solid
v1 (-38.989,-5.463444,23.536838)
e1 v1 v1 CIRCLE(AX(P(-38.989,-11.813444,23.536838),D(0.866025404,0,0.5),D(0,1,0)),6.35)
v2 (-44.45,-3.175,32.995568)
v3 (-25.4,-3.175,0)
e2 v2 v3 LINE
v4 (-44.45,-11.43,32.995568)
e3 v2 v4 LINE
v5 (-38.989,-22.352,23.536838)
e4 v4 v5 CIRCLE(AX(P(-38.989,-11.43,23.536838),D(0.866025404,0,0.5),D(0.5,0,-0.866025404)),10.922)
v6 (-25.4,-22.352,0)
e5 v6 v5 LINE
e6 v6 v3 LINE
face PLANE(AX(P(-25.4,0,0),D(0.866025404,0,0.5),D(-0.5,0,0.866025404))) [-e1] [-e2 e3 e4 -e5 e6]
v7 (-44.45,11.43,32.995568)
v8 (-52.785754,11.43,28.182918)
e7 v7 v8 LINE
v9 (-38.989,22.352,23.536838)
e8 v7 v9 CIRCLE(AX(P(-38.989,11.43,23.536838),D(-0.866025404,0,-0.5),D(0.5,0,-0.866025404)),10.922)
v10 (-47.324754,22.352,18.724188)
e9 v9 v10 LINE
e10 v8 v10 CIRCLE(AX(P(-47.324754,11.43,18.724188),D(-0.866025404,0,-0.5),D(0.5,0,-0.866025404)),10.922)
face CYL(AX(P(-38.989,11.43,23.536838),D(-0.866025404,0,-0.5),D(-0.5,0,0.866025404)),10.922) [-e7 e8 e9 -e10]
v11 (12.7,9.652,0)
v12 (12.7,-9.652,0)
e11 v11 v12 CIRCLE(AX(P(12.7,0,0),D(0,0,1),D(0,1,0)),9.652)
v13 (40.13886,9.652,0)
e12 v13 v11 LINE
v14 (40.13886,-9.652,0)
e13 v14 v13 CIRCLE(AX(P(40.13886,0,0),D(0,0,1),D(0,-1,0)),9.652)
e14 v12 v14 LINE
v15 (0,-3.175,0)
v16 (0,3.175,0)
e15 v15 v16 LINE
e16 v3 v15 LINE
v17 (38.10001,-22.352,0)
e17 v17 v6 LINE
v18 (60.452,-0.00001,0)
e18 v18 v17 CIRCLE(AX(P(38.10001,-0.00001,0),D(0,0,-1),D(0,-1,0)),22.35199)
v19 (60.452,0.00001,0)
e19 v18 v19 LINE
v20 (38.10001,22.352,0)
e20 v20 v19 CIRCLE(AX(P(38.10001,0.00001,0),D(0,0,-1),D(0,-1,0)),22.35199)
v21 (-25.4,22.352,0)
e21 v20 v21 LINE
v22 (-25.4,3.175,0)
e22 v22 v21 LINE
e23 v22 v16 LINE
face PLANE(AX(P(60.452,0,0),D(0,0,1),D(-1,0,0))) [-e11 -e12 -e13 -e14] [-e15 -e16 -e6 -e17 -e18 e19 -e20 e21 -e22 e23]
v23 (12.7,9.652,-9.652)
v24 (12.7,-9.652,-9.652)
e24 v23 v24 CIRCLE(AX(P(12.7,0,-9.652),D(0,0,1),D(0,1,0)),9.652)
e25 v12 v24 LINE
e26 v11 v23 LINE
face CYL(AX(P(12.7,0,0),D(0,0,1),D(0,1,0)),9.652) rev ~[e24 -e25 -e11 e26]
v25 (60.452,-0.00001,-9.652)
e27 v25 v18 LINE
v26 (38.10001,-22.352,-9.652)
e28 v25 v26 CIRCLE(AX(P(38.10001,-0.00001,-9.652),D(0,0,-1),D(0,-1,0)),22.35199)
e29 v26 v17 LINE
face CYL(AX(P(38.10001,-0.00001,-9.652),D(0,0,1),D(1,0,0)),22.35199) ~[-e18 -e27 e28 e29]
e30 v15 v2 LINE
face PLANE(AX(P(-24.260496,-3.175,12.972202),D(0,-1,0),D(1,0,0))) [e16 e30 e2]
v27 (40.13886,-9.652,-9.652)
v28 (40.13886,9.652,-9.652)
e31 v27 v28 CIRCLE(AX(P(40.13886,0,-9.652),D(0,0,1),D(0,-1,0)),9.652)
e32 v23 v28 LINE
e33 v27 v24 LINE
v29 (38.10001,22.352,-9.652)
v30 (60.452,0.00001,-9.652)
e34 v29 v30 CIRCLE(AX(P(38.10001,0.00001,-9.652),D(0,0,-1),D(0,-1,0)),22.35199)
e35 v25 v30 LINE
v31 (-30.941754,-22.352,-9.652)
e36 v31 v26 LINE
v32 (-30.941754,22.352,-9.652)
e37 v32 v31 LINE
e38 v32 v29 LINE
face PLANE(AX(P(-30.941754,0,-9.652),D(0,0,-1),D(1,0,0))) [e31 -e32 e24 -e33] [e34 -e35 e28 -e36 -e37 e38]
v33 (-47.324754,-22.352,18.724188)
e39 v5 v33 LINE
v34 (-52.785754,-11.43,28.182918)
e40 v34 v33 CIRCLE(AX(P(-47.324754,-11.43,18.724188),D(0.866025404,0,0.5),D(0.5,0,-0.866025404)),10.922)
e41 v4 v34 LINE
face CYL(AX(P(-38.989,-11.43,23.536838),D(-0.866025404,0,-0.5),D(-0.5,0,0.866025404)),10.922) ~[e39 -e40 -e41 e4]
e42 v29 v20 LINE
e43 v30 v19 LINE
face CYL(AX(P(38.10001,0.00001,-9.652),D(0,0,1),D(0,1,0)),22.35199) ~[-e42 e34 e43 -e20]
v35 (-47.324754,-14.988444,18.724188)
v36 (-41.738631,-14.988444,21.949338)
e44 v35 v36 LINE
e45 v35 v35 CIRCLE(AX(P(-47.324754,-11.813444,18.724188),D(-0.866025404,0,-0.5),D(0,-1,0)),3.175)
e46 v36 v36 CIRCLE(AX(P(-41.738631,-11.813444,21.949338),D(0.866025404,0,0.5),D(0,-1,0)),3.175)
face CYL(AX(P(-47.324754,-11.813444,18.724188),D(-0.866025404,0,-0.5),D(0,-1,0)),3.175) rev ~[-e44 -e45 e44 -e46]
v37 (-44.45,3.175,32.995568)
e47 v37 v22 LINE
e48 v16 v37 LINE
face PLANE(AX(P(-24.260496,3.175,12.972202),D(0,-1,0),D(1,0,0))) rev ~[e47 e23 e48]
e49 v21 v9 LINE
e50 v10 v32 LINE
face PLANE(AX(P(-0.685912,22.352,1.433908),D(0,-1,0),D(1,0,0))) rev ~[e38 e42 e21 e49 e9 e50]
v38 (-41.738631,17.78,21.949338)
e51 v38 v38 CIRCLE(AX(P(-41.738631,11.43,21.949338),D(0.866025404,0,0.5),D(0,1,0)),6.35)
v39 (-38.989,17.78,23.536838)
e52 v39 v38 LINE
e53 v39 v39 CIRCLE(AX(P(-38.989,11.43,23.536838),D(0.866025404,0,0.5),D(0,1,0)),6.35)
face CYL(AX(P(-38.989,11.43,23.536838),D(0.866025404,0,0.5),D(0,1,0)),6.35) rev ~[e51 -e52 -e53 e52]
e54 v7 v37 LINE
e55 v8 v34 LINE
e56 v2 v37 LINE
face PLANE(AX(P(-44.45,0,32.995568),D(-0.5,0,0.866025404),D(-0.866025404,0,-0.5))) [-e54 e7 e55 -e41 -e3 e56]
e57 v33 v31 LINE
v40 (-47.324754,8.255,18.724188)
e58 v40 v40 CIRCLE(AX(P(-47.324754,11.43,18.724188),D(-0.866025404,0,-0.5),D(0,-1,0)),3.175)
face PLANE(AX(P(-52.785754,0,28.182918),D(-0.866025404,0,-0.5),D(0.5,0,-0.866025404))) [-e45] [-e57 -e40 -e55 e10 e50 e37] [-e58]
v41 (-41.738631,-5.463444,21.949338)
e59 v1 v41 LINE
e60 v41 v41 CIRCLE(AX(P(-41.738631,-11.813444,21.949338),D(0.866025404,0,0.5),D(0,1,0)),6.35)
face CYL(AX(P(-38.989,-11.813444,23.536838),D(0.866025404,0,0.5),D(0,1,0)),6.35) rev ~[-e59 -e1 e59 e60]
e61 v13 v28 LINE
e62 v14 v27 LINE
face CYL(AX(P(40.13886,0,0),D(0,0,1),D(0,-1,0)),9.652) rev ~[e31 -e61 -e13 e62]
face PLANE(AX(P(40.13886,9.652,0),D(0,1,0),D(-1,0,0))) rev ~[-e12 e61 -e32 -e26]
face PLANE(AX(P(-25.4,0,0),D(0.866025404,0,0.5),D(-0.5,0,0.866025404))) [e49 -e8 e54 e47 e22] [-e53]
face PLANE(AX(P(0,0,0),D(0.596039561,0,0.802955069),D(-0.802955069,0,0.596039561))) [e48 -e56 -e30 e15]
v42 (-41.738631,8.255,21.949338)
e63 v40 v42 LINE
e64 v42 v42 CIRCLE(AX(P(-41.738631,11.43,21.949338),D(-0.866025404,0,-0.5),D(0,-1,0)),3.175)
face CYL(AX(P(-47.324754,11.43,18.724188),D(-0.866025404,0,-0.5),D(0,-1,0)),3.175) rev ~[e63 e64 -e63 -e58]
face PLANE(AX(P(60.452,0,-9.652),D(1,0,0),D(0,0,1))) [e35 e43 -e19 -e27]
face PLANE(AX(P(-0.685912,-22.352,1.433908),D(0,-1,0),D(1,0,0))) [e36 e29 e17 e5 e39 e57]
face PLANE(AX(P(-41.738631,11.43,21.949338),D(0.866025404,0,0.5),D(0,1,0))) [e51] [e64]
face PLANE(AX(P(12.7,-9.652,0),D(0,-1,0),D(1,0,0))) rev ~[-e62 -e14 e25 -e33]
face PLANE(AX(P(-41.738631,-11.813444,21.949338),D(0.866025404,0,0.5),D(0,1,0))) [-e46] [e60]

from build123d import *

# Parameters (mm, degrees)
F1_DEPTH = 22.352
F2_DEPTH = 3.175
F4_R     = 22.35199
F5_DEPTH = 25.4
F6_R     = 3.175
F7_DEPTH = 25.4
F8_R     = 6.35
F8_R_2   = 3.175
F9_DEPTH = 3.175
F10_R    = 10.922


# Not quite as in the source:
# - a fillet or chamfer is up to 0.001 mm smaller than in the source, because OpenCascade refuses the exact size


with BuildPart() as f1:
    # F0 (on Front) → F1 (new body, symmetric)
    with BuildSketch(Plane.XZ):
        Polygon((0, 0), (-25.4, 0), (-44.45, 32.9955678842), (-52.7857543947, 28.1829178405), (-30.9417543947, -9.652), (60.452, -9.652), (60.452, 0), align=None)
    extrude(amount=F1_DEPTH, both=True)

    # F0 (on Front) → F2 (join, symmetric)
    with BuildSketch(Plane.XZ):
        Polygon((-44.45, 32.9955678842), (-25.4, 0), (0, 0), align=None)
    extrude(amount=F2_DEPTH, both=True)

    # F4 (radius 22.352 in the source; OpenCascade refuses exactly that, so slightly less here)
    f4_edges = [f1.edges().sort_by_distance(p)[0] for p in [
        (60.452, -22.352, -4.826),
        (60.452, 22.352, -4.826),
    ]]
    fillet(f4_edges, radius=F4_R)

    # F3 (on face) → F5 (cut)
    with BuildSketch(Plane.XY):
        with BuildLine():
            ThreePointArc((12.7, 9.652), (3.048, 0), (12.7, -9.652))
            Line((12.7, -9.652), (40.1388603866, -9.652))
            ThreePointArc((40.1388603866, -9.652), (49.7908603866, 0), (40.1388603866, 9.652))
            Line((40.1388603866, 9.652), (12.7, 9.652))
        make_face()
    extrude(amount=-F5_DEPTH, mode=Mode.SUBTRACT)

    # F6 (on face) → F7 (cut)
    with BuildSketch(Plane(origin=(-27.3857543947, 0, -15.8111726717), x_dir=(0, -1, 0), z_dir=(-0.8660254038, 0, -0.5))):
        with Locations((11.8134439608, 39.878)):
            Circle(F6_R)
        with Locations((-11.43, 39.878)):
            Circle(F6_R)
    extrude(amount=-F7_DEPTH, mode=Mode.SUBTRACT)

    # F8 (on face) → F9 (cut)
    with BuildSketch(Plane(origin=(-19.05, 0, -10.9985226281), x_dir=(0, 1, 0), z_dir=(0.8660254038, 0, 0.5))):
        with Locations((-11.8134439608, 39.878)):
            Circle(F8_R)
        with Locations((-11.8134439608, 39.878)):
            Circle(F8_R_2, mode=Mode.SUBTRACT)
        with Locations((11.43, 39.878)):
            Circle(F8_R)
    extrude(amount=-F9_DEPTH, mode=Mode.SUBTRACT)

    # F10
    f10_edges = [f1.edges().sort_by_distance(p)[0] for p in [
        (-48.617877, -22.352, 30.589243),
        (-48.617877, 22.352, 30.589243),
    ]]
    fillet(f10_edges, radius=F10_R)


solid = f1.part
